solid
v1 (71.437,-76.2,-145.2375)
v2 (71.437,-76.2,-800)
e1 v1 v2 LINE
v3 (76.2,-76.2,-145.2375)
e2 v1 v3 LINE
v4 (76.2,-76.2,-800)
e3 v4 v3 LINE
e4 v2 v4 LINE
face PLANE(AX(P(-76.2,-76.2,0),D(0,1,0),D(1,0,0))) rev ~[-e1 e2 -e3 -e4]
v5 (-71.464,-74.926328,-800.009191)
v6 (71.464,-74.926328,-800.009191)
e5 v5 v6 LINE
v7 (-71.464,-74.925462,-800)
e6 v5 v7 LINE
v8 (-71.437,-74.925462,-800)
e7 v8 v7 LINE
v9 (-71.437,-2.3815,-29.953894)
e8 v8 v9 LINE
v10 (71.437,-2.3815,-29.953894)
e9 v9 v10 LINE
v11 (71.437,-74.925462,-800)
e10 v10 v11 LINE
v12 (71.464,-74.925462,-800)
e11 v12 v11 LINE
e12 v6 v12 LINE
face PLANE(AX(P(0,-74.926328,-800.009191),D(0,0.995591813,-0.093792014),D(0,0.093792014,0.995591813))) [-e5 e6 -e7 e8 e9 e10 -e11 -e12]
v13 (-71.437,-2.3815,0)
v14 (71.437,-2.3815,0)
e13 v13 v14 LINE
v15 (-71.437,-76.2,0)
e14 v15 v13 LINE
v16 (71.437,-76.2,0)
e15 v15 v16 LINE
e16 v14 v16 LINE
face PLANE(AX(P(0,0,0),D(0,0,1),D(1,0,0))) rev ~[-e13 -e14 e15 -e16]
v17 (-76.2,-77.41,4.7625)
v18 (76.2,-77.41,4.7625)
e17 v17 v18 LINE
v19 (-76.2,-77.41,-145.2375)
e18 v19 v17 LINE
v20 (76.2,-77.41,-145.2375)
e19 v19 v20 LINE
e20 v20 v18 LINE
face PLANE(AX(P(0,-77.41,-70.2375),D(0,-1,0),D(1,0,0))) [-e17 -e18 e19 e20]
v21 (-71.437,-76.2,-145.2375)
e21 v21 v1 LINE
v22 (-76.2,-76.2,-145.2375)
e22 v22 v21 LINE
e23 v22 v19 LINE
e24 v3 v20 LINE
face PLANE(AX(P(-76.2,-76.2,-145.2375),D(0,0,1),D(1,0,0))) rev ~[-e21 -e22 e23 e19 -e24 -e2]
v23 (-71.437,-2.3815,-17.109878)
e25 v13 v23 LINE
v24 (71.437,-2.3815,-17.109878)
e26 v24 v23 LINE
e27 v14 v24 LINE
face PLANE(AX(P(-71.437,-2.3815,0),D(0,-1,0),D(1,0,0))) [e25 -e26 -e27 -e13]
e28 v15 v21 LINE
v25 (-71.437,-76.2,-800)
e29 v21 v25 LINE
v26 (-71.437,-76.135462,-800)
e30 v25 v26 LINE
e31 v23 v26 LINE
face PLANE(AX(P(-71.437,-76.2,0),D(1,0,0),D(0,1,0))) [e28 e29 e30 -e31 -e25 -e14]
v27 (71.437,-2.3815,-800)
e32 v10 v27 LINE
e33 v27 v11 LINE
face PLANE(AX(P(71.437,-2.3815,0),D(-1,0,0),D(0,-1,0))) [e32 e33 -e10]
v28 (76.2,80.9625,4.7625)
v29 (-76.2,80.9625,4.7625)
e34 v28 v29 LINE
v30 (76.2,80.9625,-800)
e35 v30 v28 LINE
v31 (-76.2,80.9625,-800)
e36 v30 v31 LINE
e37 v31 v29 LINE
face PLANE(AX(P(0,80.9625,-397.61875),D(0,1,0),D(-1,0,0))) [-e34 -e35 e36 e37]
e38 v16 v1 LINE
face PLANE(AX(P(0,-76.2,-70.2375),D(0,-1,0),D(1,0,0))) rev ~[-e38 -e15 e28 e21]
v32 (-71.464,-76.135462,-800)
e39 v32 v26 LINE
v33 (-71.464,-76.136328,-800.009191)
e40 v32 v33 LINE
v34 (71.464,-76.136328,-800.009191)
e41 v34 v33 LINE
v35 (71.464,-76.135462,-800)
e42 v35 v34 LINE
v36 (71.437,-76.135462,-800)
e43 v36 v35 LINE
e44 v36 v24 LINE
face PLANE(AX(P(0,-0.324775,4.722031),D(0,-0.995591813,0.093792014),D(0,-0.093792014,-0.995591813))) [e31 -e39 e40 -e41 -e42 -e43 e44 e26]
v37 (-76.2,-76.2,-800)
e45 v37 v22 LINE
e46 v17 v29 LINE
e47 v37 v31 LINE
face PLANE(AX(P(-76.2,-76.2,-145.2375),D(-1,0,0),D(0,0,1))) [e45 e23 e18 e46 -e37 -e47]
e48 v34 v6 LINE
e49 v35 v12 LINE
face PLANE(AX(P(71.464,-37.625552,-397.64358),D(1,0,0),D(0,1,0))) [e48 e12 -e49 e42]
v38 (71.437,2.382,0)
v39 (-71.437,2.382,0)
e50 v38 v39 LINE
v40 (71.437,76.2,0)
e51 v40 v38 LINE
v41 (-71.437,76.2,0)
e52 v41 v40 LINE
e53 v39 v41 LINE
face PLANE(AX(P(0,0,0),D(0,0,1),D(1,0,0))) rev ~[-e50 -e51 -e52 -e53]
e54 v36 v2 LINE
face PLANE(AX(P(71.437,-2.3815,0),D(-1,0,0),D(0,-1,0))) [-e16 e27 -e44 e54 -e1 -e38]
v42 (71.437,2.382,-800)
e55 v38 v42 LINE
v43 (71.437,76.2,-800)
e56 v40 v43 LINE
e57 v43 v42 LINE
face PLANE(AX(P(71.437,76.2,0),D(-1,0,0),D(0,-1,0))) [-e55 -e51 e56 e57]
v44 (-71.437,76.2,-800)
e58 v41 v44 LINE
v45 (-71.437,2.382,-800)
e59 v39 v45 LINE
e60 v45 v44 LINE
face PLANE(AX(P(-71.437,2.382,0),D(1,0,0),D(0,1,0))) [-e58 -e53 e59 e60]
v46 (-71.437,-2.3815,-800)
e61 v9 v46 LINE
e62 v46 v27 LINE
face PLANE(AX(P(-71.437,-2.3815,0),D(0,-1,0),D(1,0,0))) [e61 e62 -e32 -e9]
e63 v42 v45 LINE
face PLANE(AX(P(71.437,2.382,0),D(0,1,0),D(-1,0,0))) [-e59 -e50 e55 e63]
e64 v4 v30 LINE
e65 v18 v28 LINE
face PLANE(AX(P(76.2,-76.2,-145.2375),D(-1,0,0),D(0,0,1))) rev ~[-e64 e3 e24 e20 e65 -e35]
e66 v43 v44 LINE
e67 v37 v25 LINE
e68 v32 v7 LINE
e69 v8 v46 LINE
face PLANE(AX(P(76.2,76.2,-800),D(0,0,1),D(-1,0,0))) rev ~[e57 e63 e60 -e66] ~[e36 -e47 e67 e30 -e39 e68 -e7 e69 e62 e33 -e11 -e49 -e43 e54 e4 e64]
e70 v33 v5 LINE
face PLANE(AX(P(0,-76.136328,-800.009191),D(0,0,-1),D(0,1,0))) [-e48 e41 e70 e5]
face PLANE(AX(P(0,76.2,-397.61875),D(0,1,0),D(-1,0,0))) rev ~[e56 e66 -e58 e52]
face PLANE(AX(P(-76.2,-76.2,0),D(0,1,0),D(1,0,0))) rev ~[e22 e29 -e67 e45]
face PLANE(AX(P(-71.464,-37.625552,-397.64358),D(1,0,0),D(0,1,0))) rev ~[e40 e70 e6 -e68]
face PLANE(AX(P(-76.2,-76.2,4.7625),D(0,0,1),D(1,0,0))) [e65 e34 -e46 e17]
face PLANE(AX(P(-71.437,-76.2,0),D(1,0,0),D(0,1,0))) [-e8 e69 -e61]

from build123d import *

# Parameters (mm, degrees)
F1_DEPTH = 800
F2_W     = 152.4
F2_H     = 152.4
F3_DEPTH = 4.7625
F4_W     = 152.4
F4_H     = 804.7625
F5_DEPTH = 4.7625
F6_W     = 152.4
F6_H     = 150
F7_DEPTH = 1.21
F9_DEPTH = 71.464


# Not quite as in the source:
# - a length typed as a fraction of an inch, garbled in the dataset ("3 / 203.2 mm" for 3/8 in), is restored


with BuildPart() as f1:
    # F0 (on Top) → F1 (new body)
    with BuildSketch(Plane.XY):
        Polygon((-76.2, 76.2), (-76.2, -76.2), (-71.437, -76.2), (-71.437, -2.3815), (71.437, -2.3815), (71.437, -76.2), (76.2, -76.2), (76.2, 76.2), (71.437, 76.2), (71.437, 2.382), (-71.437, 2.382), (-71.437, 76.2), align=None)
    extrude(amount=-F1_DEPTH)

    # F2 (on face) → F3 (join)
    with BuildSketch(Plane.XY):
        Rectangle(F2_W, F2_H)
    extrude(amount=F3_DEPTH)

    # F4 (on face) → F5 (join)
    with BuildSketch(Plane(origin=(0, 76.2, 0), x_dir=(-1, 0, 0), z_dir=(0, 1, 0))):
        with Locations((0, -397.61875)):
            Rectangle(F4_W, F4_H)
    extrude(amount=F5_DEPTH)

    # F6 (on face) → F7 (join)
    with BuildSketch(Plane.XZ.offset(76.2)):
        with Locations((0, -70.2375)):
            Rectangle(F6_W, F6_H)
    extrude(amount=F7_DEPTH)

    # F8 (on Right) → F9 (join, symmetric)
    with BuildSketch(Plane.YZ):
        Polygon((-76.13632828, -800.0091910362), (-74.92632828, -800.0091910362), (0.8852251628, 4.7220308334), (-0.3247748372, 4.7220308334), align=None)
    extrude(amount=F9_DEPTH, both=True)


solid = f1.part
